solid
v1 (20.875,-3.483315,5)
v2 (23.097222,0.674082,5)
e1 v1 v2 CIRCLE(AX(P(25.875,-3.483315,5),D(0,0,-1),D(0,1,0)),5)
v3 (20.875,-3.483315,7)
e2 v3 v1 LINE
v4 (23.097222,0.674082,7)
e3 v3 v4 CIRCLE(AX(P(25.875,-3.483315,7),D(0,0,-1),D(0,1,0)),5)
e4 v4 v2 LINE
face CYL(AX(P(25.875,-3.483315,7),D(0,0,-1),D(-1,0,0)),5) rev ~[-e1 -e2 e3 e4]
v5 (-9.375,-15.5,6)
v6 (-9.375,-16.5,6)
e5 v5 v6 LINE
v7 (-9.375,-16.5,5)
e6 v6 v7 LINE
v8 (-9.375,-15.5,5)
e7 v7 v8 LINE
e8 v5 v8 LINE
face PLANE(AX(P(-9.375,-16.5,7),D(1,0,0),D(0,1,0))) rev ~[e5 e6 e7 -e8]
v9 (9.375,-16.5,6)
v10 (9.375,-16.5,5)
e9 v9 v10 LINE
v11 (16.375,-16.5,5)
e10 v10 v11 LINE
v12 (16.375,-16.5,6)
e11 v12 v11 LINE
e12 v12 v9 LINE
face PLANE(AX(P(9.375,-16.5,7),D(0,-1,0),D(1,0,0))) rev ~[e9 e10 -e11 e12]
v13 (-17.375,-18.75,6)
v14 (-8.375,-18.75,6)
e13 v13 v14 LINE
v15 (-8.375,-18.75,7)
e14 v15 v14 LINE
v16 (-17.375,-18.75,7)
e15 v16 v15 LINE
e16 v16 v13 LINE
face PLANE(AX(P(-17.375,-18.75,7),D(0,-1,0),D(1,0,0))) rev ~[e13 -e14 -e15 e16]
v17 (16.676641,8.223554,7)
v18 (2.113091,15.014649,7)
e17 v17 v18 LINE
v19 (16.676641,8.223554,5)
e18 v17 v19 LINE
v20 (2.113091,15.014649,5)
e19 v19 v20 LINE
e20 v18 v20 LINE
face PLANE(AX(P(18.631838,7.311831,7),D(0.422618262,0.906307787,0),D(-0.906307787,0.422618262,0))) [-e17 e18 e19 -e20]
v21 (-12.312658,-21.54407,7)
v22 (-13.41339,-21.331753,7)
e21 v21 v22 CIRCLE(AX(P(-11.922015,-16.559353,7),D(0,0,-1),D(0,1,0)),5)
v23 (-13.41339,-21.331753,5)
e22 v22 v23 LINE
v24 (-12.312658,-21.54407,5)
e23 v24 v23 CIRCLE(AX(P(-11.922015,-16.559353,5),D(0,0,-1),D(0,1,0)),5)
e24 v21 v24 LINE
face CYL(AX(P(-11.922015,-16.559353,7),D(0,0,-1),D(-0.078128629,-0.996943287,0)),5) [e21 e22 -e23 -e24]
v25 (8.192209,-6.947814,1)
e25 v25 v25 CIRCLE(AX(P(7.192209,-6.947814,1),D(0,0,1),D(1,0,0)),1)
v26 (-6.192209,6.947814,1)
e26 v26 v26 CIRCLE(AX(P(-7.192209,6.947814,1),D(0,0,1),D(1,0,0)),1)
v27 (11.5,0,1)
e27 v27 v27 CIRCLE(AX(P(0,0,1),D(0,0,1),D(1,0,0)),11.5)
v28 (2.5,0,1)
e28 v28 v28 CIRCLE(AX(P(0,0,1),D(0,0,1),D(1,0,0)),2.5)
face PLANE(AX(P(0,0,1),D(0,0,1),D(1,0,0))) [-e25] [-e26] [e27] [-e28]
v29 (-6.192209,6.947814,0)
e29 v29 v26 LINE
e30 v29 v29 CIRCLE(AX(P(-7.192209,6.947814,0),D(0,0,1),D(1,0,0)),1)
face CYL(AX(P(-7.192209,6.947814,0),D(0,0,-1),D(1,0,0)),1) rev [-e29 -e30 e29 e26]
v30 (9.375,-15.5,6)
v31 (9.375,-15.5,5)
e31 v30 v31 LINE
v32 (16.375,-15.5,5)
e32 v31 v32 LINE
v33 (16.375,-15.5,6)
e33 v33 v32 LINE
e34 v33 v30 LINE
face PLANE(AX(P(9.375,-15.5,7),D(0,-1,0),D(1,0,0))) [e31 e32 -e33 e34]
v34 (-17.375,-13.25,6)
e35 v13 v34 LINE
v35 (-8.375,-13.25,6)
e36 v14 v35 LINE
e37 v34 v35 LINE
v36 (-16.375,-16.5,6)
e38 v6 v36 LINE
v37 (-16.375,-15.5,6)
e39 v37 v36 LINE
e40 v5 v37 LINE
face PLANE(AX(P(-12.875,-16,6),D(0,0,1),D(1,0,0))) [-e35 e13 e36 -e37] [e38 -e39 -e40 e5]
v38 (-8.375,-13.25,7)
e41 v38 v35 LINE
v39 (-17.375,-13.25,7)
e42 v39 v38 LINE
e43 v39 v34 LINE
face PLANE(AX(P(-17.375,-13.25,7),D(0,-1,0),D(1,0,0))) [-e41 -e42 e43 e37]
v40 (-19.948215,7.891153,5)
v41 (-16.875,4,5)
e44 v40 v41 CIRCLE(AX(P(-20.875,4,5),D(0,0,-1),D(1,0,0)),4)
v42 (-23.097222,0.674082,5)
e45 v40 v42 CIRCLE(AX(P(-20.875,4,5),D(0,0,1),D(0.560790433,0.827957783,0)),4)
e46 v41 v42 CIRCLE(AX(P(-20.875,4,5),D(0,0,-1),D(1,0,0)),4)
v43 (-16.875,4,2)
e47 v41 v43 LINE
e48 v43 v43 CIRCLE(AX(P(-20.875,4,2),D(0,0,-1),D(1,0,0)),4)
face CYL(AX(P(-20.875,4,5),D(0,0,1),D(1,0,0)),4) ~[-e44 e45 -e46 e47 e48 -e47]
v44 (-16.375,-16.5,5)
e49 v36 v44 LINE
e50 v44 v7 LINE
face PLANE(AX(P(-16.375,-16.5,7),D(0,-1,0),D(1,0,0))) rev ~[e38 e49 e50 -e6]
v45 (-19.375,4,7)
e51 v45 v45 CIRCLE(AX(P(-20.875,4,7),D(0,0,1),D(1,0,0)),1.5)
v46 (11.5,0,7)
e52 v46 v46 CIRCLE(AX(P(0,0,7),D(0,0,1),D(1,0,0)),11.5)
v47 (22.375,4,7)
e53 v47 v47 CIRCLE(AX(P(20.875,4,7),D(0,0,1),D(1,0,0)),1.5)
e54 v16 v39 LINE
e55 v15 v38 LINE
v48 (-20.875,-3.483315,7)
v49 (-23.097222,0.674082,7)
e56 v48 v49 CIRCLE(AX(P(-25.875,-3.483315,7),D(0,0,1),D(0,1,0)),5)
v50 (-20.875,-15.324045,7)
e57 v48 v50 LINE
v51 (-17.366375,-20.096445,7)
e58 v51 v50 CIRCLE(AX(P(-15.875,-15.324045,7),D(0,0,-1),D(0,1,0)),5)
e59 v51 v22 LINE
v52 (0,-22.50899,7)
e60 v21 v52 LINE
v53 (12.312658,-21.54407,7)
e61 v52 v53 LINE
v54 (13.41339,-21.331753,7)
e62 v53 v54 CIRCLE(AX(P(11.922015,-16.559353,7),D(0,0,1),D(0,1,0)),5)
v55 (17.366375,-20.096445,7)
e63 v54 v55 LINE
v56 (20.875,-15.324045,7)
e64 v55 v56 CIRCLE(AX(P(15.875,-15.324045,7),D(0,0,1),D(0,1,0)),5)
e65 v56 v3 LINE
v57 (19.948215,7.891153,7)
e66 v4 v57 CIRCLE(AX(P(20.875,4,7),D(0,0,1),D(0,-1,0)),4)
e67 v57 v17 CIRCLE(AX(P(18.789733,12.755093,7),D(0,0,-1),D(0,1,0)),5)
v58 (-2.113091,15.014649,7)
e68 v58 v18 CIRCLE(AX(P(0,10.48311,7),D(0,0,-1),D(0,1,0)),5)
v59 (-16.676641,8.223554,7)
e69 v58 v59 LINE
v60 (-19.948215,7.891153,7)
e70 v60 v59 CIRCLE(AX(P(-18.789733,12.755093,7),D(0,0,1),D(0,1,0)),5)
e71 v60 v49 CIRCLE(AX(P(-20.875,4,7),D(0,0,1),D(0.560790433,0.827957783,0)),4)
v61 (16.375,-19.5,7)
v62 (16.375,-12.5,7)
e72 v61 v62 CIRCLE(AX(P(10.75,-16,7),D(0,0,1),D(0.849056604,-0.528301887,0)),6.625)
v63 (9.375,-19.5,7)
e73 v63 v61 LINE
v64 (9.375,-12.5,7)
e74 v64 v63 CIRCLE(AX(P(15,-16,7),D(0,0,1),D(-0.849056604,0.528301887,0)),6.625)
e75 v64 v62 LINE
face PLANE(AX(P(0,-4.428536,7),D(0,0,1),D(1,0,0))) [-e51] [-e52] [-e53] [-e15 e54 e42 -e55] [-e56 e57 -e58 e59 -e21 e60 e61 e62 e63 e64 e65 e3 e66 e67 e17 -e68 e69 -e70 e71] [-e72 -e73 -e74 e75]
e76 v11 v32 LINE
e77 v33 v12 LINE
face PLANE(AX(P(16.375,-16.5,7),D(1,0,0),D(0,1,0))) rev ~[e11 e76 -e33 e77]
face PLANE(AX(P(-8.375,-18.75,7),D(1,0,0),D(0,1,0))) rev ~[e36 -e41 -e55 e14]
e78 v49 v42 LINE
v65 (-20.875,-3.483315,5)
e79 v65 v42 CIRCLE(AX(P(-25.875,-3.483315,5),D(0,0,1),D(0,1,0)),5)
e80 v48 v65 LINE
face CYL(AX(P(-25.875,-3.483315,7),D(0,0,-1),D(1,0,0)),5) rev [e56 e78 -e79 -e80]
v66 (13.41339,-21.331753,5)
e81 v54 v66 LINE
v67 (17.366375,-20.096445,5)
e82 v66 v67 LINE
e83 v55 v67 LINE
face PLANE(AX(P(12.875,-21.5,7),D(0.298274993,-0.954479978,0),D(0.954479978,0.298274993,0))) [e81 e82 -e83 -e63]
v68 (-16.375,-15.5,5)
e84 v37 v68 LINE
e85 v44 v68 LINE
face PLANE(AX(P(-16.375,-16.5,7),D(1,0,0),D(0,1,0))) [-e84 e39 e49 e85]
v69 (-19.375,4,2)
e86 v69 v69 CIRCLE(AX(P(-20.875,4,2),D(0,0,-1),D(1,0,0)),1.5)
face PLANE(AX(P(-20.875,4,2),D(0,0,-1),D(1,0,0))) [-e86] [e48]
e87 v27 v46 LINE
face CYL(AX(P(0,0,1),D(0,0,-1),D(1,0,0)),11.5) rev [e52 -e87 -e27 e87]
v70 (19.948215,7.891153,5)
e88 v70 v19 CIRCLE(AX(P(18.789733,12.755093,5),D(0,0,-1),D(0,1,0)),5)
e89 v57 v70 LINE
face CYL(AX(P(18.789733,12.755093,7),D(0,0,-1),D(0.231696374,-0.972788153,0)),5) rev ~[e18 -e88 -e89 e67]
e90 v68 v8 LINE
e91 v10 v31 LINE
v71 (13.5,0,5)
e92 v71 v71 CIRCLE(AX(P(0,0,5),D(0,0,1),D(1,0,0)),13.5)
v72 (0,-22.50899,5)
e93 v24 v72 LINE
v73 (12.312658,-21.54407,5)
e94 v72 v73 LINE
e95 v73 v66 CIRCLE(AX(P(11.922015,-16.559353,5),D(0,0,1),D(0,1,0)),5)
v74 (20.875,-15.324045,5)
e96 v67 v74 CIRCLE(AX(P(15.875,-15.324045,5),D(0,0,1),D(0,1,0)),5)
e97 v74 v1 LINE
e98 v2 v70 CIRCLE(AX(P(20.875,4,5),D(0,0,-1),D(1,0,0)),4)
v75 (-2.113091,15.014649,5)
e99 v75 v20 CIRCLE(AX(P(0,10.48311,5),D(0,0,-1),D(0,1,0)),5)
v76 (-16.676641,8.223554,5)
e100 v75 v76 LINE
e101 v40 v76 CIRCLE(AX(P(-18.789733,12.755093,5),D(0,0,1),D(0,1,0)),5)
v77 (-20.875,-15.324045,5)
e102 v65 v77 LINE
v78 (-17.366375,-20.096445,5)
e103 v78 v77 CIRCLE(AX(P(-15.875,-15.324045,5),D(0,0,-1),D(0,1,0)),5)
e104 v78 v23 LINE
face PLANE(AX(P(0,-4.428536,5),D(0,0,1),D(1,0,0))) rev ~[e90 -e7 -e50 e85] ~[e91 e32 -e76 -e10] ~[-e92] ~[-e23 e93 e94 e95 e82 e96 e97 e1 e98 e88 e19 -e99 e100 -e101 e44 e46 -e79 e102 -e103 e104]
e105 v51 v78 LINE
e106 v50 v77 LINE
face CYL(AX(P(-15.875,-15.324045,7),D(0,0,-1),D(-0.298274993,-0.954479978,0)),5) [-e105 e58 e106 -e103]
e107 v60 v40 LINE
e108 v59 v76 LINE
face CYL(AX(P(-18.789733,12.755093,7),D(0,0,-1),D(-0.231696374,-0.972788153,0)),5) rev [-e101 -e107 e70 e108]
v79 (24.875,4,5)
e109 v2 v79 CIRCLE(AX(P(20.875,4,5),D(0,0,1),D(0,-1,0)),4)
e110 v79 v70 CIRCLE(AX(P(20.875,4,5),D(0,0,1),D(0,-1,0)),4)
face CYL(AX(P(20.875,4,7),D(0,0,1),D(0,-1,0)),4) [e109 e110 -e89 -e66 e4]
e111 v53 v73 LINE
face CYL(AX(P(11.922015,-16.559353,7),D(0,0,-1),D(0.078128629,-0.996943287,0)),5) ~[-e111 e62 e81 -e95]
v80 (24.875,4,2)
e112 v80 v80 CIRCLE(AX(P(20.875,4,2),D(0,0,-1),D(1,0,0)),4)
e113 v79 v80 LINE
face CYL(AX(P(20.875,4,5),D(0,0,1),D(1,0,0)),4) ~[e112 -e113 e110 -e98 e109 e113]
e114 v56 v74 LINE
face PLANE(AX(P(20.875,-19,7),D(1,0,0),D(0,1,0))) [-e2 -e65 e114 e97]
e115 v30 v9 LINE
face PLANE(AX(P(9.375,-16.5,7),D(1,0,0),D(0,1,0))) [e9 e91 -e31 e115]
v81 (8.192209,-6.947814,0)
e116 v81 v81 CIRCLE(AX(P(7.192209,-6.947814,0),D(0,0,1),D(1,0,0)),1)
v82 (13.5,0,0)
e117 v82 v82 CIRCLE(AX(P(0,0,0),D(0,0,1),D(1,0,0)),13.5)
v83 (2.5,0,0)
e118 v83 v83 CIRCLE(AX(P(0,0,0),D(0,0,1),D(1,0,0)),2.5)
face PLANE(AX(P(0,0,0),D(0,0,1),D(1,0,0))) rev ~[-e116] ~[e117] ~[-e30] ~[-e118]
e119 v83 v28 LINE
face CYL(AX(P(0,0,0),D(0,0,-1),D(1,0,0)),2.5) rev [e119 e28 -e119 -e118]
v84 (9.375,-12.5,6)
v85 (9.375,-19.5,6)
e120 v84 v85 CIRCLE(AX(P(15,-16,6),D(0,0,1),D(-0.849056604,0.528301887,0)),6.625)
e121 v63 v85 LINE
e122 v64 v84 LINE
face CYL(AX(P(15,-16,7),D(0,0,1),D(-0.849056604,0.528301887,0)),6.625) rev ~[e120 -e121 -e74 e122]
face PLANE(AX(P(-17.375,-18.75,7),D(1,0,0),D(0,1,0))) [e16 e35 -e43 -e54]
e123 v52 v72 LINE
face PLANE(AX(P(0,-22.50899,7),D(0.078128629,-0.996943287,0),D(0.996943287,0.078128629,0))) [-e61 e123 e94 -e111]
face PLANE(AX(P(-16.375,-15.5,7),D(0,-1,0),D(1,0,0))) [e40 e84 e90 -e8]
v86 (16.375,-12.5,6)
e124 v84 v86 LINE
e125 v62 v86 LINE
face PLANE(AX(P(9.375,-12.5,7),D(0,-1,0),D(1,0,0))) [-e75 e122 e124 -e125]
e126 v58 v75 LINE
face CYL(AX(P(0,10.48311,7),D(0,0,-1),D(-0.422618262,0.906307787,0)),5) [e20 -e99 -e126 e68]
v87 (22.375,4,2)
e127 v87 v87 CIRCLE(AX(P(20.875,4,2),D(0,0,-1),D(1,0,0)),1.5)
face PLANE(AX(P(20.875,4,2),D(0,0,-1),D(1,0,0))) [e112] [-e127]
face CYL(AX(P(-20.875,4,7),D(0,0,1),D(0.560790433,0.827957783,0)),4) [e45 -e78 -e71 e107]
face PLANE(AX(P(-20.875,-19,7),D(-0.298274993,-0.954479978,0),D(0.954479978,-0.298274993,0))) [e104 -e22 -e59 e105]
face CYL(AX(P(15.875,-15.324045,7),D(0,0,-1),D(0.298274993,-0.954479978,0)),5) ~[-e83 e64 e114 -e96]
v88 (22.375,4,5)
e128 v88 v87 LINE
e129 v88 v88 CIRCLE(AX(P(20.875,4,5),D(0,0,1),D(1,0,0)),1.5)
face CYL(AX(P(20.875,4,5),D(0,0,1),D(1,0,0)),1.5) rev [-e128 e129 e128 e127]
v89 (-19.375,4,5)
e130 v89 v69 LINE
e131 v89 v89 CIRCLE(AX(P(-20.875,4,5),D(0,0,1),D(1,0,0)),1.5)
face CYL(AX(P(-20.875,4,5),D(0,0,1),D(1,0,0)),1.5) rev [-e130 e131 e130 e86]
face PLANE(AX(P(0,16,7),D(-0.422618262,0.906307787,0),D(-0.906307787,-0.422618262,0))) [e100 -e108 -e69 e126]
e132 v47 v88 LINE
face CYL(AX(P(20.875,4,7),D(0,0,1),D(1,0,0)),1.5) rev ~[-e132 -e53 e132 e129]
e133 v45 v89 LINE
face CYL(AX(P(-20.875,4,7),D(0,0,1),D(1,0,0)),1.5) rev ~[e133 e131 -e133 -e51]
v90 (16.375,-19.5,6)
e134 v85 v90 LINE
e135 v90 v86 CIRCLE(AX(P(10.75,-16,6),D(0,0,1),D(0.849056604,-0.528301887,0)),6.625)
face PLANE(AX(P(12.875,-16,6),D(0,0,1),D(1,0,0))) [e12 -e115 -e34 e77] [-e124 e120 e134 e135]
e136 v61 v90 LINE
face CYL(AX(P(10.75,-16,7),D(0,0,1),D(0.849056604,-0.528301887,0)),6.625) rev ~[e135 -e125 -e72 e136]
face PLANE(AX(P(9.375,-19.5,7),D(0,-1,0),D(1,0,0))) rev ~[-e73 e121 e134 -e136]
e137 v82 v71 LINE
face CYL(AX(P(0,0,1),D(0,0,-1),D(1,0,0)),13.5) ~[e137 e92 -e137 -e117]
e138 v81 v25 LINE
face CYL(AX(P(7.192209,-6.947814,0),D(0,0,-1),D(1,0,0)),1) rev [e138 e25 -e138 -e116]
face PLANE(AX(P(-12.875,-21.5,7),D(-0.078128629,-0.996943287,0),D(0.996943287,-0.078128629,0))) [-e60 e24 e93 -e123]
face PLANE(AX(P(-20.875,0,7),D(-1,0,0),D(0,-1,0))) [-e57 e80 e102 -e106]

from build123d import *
from build123d import SkipClean  # not in build123d's __all__

# Parameters (mm, degrees)
F0_R      = 13.5
F0_R_2    = 1
F0_R_3    = 2.5
F1_DEPTH  = 1
F2_R      = 13.5
F2_R_2    = 11.5
F3_DEPTH  = 6
F4_W      = 7
F4_H      = 1
F4_R      = 1.5
F4_R_2    = 13.5
F5_DEPTH  = 2
F6_R      = 5
F7_W      = 7
F7_H      = 7
F7_W_2    = 9
F7_H_2    = 5.5
F8_DEPTH  = 1
F9_R      = 4
F9_R_2    = 1.5
F10_DEPTH = 3


with BuildPart() as f1:
    # F0 (on Top) → F1 (new body)
    with BuildSketch(Plane.XY):
        Circle(F0_R)
        with Locations((7.1922094223, -6.9478143056)):
            Circle(F0_R_2, mode=Mode.SUBTRACT)
        with Locations((-7.1922094223, 6.9478143056)):
            Circle(F0_R_2, mode=Mode.SUBTRACT)
        Circle(F0_R_3, mode=Mode.SUBTRACT)
    extrude(amount=F1_DEPTH)

    # F2 (on face) → F3 (join)
    with BuildSketch(Plane.XY.offset(1)):
        Circle(F2_R)
        Circle(F2_R_2, mode=Mode.SUBTRACT)
    extrude(amount=F3_DEPTH)

    # F4 (on face) → F5 (join)
    with BuildSketch(Plane.XY.offset(7)):
        with BuildLine():
            Line((-12.875, -21.5), (0, -22.5089902885))
            Line((0, -22.5089902885), (12.875, -21.5))
            Line((12.875, -21.5), (20.875, -19))
            Line((20.875, -19), (20.875, 0))
            ThreePointArc((20.875, 0), (24.6990897298, 5.1731742149), (18.6318382667, 7.3118311307))
            Line((18.6318382667, 7.3118311307), (0, 16))
            Line((0, 16), (-18.6318382667, 7.3118311307))
            ThreePointArc((-18.6318382667, 7.3118311307), (-24.6990897298, 5.1731742149), (-20.875, 0))
            Line((-20.875, 0), (-20.875, -19))
            Line((-20.875, -19), (-12.875, -21.5))
        make_face()
        with Locations((-12.875, -16)):
            Rectangle(F4_W, F4_H, mode=Mode.SUBTRACT)
        with Locations((12.875, -16)):
            Rectangle(F4_W, F4_H, mode=Mode.SUBTRACT)
        with Locations((-20.875, 4)):
            Circle(F4_R, mode=Mode.SUBTRACT)
        Circle(F4_R_2, mode=Mode.SUBTRACT)
        with Locations((20.875, 4)):
            Circle(F4_R, mode=Mode.SUBTRACT)
    extrude(amount=-F5_DEPTH)

    # F6
    f6_edges = [f1.edges().sort_by_distance(p)[0] for p in [
        (0, 16, 6),
        (20.875, -19, 6),
        (12.875, -21.5, 6),
        (-12.875, -21.5, 6),
        (-20.875, -19, 6),
        (-20.875, 0, 6),
        (-18.631838, 7.311831, 6),
        (18.631838, 7.311831, 6),
        (20.875, 0, 6),
    ]]
    fillet(f6_edges, radius=F6_R)

    # F7 (on face) → F8 (cut)
    with BuildSketch(Plane.XY.offset(7)):
        with Locations((12.875, -16)):
            Rectangle(F7_W, F7_H)
        with BuildLine():
            ThreePointArc((16.375, -19.5), (17.375, -16), (16.375, -12.5))
            Line((16.375, -12.5), (16.375, -19.5))
        make_face()
        with BuildLine():
            Line((9.375, -19.5), (9.375, -12.5))
            ThreePointArc((9.375, -12.5), (8.375, -16), (9.375, -19.5))
        make_face()
        with Locations((-12.875, -16)):
            Rectangle(F7_W_2, F7_H_2)
    extrude(amount=-F8_DEPTH, mode=Mode.SUBTRACT)

    # F9 (on face) → F10 (join)
    with BuildSketch(Plane(origin=(0, 0, 5), x_dir=(1, 0, 0), z_dir=(0, 0, -1))):
        with Locations((20.875, -4)):
            Circle(F9_R)
        with Locations((20.875, -4)):
            Circle(F9_R_2, mode=Mode.SUBTRACT)
        with Locations((-20.875, -4)):
            Circle(F9_R)
        with Locations((-20.875, -4)):
            Circle(F9_R_2, mode=Mode.SUBTRACT)
    with SkipClean():  # cleaning this boolean's faces spoils the solid; the shape is the same uncleaned
        extrude(amount=F10_DEPTH)


solid = f1.part
